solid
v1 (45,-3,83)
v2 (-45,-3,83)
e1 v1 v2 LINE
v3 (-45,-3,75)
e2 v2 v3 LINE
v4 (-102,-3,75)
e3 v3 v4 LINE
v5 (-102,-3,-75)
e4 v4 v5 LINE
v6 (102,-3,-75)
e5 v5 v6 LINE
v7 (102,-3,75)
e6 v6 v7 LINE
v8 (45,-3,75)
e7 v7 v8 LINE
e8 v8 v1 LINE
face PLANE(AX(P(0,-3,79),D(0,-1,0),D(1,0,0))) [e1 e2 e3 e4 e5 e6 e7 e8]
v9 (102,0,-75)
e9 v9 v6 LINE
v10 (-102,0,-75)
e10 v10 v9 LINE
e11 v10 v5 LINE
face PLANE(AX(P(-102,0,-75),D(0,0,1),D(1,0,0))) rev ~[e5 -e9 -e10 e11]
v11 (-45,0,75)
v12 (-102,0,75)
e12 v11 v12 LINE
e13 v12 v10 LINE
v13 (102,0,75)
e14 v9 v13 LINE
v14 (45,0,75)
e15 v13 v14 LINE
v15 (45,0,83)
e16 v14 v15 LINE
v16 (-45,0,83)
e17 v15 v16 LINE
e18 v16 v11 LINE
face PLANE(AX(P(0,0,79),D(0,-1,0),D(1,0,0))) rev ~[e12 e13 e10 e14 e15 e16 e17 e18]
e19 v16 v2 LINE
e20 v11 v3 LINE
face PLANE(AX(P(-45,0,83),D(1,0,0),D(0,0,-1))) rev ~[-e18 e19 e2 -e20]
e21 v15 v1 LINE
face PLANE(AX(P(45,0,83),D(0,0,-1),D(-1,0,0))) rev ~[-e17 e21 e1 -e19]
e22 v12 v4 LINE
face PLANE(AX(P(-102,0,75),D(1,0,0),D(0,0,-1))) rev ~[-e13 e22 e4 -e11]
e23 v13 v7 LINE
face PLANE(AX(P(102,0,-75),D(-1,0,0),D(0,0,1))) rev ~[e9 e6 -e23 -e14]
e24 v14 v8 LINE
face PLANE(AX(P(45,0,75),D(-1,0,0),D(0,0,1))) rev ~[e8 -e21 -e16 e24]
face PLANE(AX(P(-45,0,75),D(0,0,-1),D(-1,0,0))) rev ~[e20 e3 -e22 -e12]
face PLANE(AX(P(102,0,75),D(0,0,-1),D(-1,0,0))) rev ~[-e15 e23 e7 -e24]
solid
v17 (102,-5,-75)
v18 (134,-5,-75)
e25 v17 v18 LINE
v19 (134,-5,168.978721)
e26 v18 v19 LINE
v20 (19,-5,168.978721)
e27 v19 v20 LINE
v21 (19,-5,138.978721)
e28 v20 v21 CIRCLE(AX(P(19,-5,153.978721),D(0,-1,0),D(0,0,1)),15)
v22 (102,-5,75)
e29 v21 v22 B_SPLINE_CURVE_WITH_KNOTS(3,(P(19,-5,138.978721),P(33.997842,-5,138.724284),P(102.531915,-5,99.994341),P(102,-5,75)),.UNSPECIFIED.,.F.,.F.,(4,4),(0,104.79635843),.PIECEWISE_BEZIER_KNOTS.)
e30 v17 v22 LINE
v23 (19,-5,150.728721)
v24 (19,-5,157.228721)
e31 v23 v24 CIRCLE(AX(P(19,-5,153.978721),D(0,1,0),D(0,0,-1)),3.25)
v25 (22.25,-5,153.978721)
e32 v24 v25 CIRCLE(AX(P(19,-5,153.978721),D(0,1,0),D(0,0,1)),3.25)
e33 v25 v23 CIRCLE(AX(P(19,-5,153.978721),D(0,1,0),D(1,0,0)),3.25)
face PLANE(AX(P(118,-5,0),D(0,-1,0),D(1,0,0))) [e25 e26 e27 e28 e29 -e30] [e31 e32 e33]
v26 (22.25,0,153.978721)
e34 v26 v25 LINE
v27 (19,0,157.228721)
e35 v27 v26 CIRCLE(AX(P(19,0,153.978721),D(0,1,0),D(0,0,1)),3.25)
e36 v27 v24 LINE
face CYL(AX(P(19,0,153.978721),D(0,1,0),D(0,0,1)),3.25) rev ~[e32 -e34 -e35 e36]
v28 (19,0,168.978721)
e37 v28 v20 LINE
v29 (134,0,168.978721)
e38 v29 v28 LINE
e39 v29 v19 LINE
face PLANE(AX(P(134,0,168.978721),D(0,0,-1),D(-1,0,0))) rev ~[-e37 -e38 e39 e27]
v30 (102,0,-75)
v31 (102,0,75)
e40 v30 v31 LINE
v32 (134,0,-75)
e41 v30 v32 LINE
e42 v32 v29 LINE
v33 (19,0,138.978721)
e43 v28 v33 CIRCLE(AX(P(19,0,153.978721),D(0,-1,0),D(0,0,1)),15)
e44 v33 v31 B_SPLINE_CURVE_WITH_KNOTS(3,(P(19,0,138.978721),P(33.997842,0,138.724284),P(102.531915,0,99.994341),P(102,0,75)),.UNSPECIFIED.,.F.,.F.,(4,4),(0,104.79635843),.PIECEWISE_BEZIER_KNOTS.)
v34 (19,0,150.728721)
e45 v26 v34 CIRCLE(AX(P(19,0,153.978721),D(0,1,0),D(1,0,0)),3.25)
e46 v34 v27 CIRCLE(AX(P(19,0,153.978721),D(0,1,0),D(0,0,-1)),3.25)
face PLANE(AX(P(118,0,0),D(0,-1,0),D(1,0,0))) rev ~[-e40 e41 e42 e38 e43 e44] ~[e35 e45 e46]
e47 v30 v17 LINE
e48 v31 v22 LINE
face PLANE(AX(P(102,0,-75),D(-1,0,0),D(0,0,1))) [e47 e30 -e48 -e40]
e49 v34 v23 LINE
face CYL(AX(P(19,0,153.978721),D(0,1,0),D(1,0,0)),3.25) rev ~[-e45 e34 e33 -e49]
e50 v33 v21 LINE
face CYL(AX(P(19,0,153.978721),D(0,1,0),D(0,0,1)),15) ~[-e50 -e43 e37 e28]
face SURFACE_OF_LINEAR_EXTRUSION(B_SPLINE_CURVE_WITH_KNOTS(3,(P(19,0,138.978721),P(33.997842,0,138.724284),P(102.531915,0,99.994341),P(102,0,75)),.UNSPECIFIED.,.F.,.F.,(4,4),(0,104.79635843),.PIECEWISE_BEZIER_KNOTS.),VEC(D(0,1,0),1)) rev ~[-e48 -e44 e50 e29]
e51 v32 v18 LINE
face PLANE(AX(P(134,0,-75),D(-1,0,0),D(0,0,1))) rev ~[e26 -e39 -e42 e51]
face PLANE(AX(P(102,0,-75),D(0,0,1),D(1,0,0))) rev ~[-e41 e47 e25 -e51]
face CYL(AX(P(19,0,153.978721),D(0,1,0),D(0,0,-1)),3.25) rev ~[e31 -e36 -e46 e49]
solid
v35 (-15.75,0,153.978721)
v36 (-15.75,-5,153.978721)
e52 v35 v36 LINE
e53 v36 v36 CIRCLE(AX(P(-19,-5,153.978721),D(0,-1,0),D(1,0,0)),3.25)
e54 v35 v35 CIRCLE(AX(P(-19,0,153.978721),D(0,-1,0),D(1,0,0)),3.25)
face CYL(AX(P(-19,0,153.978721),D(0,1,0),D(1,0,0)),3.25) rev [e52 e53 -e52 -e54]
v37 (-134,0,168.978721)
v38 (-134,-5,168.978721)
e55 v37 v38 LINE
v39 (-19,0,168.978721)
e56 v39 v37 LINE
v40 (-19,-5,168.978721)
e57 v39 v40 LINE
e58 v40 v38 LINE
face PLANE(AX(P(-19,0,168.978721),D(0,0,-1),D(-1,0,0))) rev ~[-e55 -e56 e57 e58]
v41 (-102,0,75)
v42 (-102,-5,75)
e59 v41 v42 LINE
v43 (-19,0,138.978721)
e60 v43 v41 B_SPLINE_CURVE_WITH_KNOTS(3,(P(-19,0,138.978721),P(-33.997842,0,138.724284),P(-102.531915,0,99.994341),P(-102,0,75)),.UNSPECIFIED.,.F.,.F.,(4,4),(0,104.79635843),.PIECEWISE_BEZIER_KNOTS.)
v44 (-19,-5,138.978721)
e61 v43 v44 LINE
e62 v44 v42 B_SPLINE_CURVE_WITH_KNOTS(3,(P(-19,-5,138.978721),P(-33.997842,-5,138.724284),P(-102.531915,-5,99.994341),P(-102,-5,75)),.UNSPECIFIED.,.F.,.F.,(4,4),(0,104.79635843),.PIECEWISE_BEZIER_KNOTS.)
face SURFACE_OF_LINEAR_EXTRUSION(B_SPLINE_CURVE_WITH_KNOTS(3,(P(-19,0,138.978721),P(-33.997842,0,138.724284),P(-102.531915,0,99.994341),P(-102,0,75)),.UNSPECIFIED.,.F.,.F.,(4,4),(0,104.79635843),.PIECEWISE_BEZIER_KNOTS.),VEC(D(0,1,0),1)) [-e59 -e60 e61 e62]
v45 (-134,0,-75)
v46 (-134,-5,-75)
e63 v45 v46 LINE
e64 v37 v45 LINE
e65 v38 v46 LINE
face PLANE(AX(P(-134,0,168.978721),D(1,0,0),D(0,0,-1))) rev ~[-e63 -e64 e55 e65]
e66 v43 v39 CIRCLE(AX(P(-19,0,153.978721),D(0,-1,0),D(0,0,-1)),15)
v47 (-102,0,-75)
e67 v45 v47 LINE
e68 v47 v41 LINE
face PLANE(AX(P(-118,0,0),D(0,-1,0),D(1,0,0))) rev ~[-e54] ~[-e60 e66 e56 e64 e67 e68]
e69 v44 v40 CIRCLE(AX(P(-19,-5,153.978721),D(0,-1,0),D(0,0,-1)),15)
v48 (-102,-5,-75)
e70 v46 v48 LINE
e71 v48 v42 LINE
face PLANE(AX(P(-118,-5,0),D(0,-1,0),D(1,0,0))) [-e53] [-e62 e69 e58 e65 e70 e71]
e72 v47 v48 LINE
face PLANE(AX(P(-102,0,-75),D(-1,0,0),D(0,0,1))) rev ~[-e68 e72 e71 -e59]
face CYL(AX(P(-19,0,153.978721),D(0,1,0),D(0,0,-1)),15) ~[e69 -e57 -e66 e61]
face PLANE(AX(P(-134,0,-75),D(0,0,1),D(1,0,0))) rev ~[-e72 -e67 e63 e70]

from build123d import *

# Parameters (mm, degrees)
F1_DEPTH = 3
F0_R     = 3.25
F2_DEPTH = 5
F0_W     = 32
F0_H     = 150


# Not quite as in the source:
# - a feature names something its author has since deleted; it is built from what else it names


with BuildPart() as f1:
    # F0 (on Front) → F1 (new body)
    with BuildSketch(Plane.XZ):
        Polygon((-45, 83), (-45, 75), (0, 75), (45, 75), (45, 83), align=None)
        Polygon((-45, 75), (-102, 75), (-102, -75), (102, -75), (102, 75), (45, 75), (0, 75), align=None)
    extrude(amount=F1_DEPTH)


with BuildPart() as f2:
    # F0 (on Front) → F2 (new body)
    with BuildSketch(Plane.XZ):
        Polygon((-104, 75), (-134, 75), (-134, -75), (-102, -75), (-102, 75), align=None)
        with BuildLine():
            Line((-134, 168.9787209958), (-134, 75))
            Line((-134, 75), (-104, 75))
            Line((-104, 75), (-102, 75))
            add(Edge.make_bspline(
                [(-19, 138.9787209958), (-33.9978419072, 138.7242841167), (-102.5319148936, 99.9943406904), (-102, 75)],
                knots=[0, 0, 0, 0, 104.7963584303, 104.7963584303, 104.7963584303, 104.7963584303], degree=3))
            ThreePointArc((-19, 138.9787209958), (-4, 153.9787209958), (-19, 168.9787209958))
            Line((-19, 168.9787209958), (-104, 168.9787209958))
            Line((-104, 168.9787209958), (-134, 168.9787209958))
        make_face()
        with Locations((-19, 153.9787209958)):
            Circle(F0_R, mode=Mode.SUBTRACT)
    extrude(amount=F2_DEPTH)


with BuildPart() as f2b:
    # F0 (on Front) → F2, piece 2 (new body)
    with BuildSketch(Plane.XZ):
        with Locations((118, 0)):
            Rectangle(F0_W, F0_H)
        Polygon((104, 168.9787209958), (102, 75), (134, 75), (134, 168.9787209958), align=None)
        with BuildLine():
            add(Edge.make_bspline(
                [(19, 138.9787209958), (33.9978419072, 138.7242841167), (102.5319148936, 99.9943406904), (102, 75)],
                knots=[0, 0, 0, 0, 104.7963584303, 104.7963584303, 104.7963584303, 104.7963584303], degree=3))
            Line((102, 75), (104, 168.9787209958))
            Line((104, 168.9787209958), (19, 168.9787209958))
            Line((19, 168.9787209958), (19, 157.2287209958))
            ThreePointArc((19, 157.2287209958), (21.2980970389, 156.2768180346), (22.25, 153.9787209958))
            ThreePointArc((22.25, 153.9787209958), (21.2980970389, 151.6806239569), (19, 150.7287209958))
            Line((19, 150.7287209958), (19, 138.9787209958))
        make_face()
        with BuildLine():
            ThreePointArc((19, 168.9787209958), (4, 153.9787209958), (19, 138.9787209958))
            Line((19, 138.9787209958), (19, 150.7287209958))
            ThreePointArc((19, 150.7287209958), (15.75, 153.9787209958), (19, 157.2287209958))
            Line((19, 157.2287209958), (19, 168.9787209958))
        make_face()
    extrude(amount=F2_DEPTH)


solid = Compound([f1.part, f2.part, f2b.part])
